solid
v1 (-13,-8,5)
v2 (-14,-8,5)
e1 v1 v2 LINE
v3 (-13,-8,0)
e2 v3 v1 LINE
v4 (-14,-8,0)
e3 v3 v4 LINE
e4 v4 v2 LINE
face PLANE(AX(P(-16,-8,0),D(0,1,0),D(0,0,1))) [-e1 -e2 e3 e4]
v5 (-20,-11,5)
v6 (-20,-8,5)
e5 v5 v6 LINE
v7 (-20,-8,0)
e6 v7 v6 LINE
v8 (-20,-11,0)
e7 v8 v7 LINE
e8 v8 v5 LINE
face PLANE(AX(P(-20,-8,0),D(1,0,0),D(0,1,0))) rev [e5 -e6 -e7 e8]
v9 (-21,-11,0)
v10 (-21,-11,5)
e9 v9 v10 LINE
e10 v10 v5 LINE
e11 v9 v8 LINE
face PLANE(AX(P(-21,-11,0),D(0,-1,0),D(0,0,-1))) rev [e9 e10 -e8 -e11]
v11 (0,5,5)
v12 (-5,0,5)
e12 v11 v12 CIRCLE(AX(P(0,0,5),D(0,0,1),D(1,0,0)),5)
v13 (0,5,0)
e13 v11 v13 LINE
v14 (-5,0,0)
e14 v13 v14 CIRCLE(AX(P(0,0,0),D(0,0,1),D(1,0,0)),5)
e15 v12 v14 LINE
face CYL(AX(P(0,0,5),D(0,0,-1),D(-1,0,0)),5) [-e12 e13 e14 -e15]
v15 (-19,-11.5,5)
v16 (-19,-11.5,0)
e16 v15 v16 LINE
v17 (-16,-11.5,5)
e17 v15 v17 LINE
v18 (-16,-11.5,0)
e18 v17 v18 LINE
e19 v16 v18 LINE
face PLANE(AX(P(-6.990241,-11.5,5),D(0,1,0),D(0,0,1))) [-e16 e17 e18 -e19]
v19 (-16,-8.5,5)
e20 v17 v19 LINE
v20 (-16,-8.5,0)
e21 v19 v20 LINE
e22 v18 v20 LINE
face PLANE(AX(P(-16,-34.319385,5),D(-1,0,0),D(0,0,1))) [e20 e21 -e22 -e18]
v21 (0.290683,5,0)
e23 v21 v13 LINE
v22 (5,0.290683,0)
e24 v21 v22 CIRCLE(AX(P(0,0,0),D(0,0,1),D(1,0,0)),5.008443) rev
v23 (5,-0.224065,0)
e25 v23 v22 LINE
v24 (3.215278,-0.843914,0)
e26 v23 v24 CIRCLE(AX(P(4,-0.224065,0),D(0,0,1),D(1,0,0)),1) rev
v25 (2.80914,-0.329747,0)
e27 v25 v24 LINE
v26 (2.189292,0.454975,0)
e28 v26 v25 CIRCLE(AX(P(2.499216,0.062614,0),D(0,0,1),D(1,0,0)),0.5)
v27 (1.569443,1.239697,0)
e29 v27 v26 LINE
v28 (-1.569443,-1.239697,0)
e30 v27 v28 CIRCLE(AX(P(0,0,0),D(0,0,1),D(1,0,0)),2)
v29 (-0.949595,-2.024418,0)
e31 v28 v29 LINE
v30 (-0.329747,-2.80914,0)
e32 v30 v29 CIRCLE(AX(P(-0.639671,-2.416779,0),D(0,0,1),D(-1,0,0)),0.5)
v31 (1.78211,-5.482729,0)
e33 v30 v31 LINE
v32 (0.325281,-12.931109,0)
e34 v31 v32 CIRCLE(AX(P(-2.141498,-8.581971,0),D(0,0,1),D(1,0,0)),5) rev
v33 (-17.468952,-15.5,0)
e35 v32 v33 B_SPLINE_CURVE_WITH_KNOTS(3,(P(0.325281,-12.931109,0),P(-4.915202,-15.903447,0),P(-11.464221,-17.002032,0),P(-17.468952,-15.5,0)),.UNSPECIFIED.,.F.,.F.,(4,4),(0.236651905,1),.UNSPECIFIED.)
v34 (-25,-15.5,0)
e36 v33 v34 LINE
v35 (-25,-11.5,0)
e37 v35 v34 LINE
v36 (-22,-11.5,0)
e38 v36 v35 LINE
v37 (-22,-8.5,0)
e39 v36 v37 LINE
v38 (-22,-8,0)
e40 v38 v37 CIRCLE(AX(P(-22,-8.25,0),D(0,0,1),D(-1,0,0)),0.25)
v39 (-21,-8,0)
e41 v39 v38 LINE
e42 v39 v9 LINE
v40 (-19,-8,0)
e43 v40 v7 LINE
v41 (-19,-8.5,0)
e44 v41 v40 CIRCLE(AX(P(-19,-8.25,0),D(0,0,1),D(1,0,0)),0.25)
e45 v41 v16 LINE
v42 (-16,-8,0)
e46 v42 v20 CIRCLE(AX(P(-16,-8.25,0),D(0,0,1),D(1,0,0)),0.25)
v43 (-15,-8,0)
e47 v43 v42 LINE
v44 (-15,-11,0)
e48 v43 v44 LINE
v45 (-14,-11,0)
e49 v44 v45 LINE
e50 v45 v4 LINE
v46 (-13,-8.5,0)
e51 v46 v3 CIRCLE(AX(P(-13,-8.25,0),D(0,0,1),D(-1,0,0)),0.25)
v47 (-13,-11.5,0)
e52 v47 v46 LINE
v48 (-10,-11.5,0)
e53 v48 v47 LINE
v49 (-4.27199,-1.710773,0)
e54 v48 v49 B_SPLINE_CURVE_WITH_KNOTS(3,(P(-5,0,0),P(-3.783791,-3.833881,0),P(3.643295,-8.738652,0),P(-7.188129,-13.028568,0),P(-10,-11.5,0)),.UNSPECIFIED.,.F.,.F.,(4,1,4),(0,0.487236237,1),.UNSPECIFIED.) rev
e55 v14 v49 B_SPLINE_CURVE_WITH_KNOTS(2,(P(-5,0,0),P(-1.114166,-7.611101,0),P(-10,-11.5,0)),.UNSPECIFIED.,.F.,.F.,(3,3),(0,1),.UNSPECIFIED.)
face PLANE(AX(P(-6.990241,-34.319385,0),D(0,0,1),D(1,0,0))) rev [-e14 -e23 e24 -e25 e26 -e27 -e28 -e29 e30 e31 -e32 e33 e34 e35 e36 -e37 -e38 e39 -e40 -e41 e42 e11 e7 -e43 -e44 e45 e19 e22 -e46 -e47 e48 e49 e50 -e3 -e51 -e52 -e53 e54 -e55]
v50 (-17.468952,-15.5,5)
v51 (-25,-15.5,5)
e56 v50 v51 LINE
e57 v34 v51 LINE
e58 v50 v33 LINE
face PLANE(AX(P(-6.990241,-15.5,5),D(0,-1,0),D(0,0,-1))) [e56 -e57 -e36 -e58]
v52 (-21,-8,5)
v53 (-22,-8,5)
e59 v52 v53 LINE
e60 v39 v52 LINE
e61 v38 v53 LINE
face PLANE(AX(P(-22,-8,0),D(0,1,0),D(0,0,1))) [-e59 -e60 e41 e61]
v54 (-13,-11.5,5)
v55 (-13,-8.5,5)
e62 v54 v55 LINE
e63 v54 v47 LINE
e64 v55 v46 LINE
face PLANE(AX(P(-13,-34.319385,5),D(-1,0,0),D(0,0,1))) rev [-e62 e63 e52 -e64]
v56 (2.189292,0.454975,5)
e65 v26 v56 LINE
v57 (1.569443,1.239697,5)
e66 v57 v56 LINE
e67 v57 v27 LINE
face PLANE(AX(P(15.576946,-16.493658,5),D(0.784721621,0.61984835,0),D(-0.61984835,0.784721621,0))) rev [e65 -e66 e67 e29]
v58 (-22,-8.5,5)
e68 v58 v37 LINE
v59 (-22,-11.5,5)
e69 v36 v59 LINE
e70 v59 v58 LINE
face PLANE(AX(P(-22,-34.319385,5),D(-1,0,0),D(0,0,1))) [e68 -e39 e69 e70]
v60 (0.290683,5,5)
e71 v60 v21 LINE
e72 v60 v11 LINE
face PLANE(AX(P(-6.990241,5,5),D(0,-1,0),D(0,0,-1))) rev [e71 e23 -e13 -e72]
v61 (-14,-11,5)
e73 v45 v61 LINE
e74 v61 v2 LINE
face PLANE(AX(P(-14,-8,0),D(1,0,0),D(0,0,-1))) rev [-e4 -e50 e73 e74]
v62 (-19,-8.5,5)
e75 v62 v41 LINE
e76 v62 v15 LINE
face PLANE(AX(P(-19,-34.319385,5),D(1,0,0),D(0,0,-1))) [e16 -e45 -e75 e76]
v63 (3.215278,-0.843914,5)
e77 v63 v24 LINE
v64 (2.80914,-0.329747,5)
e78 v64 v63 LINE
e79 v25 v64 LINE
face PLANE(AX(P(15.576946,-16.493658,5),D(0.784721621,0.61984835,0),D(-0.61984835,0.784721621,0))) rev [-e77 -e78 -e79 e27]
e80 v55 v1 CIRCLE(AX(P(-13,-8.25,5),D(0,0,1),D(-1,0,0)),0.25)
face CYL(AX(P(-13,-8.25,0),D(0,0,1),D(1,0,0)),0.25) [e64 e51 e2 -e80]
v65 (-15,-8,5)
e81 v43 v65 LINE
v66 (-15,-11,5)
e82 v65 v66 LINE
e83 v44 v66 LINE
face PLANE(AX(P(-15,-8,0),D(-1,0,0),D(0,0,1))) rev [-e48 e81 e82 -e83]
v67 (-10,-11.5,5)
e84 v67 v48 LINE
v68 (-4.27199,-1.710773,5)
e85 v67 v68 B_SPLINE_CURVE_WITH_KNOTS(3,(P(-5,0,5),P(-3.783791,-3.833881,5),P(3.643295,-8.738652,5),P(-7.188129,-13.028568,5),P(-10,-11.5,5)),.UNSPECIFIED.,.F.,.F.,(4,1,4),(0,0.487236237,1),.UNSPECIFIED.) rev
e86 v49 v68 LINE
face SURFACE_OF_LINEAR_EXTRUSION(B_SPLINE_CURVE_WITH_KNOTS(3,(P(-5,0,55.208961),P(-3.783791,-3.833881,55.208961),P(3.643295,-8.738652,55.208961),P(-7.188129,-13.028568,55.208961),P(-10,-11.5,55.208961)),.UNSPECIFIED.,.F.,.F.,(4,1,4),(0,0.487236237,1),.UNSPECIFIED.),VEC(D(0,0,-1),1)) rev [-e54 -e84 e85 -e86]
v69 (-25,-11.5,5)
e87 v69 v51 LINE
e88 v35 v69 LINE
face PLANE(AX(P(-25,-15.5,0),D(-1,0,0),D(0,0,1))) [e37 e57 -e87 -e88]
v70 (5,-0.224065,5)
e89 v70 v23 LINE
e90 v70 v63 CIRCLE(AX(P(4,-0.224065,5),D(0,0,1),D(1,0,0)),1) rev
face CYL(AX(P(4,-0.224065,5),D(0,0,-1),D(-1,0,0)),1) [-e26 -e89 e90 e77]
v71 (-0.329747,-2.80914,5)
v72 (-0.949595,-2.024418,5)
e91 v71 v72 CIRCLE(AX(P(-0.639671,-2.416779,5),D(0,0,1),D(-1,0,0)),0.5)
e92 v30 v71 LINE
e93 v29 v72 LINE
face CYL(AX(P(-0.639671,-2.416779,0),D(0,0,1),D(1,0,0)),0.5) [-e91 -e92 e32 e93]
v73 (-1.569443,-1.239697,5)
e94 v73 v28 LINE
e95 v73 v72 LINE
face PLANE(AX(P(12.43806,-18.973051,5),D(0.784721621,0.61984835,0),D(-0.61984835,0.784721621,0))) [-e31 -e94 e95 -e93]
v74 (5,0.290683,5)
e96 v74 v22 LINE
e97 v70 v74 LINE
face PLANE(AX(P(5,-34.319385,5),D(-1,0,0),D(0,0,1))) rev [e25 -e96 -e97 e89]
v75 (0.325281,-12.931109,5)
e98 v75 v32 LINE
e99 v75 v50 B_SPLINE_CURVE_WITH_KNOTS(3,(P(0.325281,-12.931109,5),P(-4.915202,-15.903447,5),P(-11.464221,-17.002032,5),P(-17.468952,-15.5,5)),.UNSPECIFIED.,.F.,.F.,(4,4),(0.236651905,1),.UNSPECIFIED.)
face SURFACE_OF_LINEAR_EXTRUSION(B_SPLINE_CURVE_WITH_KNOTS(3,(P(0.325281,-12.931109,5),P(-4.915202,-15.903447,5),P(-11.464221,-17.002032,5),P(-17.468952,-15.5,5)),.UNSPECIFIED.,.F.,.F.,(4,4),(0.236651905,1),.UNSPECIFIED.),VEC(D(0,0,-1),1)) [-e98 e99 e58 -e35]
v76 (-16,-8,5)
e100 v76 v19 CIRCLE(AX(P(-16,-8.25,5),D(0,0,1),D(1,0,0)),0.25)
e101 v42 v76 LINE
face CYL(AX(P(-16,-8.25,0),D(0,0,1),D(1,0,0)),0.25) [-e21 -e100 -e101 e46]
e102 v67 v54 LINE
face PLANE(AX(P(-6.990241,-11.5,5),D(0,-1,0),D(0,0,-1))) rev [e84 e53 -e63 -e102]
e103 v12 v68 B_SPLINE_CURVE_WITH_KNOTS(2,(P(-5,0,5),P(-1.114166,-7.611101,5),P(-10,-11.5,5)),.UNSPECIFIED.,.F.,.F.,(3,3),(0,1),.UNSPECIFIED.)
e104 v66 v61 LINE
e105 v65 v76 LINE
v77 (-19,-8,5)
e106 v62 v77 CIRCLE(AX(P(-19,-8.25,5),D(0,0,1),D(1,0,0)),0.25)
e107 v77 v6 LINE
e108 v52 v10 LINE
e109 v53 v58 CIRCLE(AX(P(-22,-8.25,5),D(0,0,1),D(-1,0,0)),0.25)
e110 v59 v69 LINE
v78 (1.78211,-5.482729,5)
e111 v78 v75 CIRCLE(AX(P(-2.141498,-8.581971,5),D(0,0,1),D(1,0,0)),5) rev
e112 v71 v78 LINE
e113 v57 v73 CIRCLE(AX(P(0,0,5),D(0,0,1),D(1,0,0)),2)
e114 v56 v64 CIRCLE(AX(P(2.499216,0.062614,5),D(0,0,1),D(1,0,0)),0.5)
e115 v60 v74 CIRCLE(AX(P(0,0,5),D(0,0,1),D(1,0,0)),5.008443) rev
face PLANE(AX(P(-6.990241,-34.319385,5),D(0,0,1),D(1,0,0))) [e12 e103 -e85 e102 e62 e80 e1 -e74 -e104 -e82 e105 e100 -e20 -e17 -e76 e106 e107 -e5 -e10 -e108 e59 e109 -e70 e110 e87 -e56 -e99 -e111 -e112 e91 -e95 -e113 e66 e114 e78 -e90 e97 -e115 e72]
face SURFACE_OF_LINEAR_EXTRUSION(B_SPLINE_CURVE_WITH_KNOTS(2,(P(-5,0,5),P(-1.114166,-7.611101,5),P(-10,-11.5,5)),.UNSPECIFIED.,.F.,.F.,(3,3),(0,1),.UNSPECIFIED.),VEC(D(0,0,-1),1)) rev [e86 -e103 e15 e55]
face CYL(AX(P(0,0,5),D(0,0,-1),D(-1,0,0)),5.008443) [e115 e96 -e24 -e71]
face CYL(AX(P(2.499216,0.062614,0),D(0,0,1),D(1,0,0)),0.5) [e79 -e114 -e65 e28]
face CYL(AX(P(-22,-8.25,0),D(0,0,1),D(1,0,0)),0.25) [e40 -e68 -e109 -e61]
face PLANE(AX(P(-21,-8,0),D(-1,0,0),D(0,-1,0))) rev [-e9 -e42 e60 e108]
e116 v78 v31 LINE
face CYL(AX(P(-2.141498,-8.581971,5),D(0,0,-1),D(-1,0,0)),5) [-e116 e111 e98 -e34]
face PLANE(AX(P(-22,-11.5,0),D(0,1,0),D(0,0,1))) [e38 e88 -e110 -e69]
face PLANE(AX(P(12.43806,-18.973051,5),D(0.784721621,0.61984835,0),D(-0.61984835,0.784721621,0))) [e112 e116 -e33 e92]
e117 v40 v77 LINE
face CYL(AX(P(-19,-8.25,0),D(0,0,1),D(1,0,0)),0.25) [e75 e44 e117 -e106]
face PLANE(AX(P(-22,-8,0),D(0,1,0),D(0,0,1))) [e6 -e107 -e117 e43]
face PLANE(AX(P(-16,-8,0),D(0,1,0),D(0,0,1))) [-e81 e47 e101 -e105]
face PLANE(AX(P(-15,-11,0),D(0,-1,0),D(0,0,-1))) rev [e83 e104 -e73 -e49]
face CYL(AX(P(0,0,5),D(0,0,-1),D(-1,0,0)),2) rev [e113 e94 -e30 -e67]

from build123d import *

# Parameters (mm, degrees)
BOSS_EXTRUDE1_DEPTH = 5
BOSS_EXTRUDE2_DEPTH = 5
CUT_EXTRUDE3_START  = -5
CUT_EXTRUDE3_DEPTH  = 5
SKETCH4_W           = 3
SKETCH4_H           = 4
BOSS_EXTRUDE3_DEPTH = 5
SKETCH5_W           = 1
SKETCH5_H           = 3
CUT_EXTRUDE4_DEPTH  = 5


# Read off the part's stored shape, not the designer's step: Cut-Extrude3
with BuildPart() as part:
    # Sketch1 → Boss-Extrude1 (new body)
    with BuildSketch(Plane.XY):
        with BuildLine():
            add(Edge.make_bspline(
                [(-5, 0), (-1.114165851, -7.611100797), (-10, -11.5)],
                knots=[0, 0, 0, 1, 1, 1], degree=2))
            Line((-10, -11.5), (-13, -11.5))
            Line((-13, -11.5), (-13, -8.5))
            Line((-13, -8.5), (-16, -8.5))
            Line((-16, -8.5), (-16, -11.5))
            Line((-16, -11.5), (-19, -11.5))
            Line((-19, -11.5), (-19, -8.5))
            Line((-19, -8.5), (-22, -8.5))
            Line((-22, -8.5), (-22, -15.5))
            Line((-22, -15.5), (-17.468951593, -15.5))
            add(Edge.make_bspline(
                [(-17.468951593, -15.5), (-11.464221473, -17.002032437), (-4.91520191, -15.903447496), (0.325280881, -12.931109156)],
                knots=[0.25236579, 0.25236579, 0.25236579, 0.25236579, 1.015713885, 1.015713885, 1.015713885, 1.015713885], degree=3))
            ThreePointArc((0.325280881, -12.931109156), (2.765522994, -9.541735665), (1.782110459, -5.482729135))
            Line((1.782110459, -5.482729135), (-1.569443242, -1.2396967))
            ThreePointArc((-1.569443242, -1.2396967), (-1.2396967, 1.569443242), (1.569443242, 1.2396967))
            Line((1.569443242, 1.2396967), (3.215278379, -0.843913615))
            ThreePointArc((3.215278379, -0.843913615), (4.328084119, -1.168713777), (5, -0.224065265))
            Line((5, -0.224065265), (5, 0.290683459))
            ThreePointArc((5, 0.290683459), (3.541503697, 3.541503697), (0.290683459, 5))
            Line((0.290683459, 5), (0, 5))
            ThreePointArc((0, 5), (-3.535533906, 3.535533906), (-5, 0))
        make_face()
    extrude(amount=BOSS_EXTRUDE1_DEPTH)

    # Sketch2 → Boss-Extrude2 (add)
    with BuildSketch(Plane.XY.offset(5)):
        with BuildLine():
            Line((2.189291593, 0.454975079), (2.809139943, -0.329746542))
            ThreePointArc((2.809139943, -0.329746542), (2.106854957, -0.247309907), (2.189291593, 0.454975079))
        make_face()
        with BuildLine():
            Line((-0.329746542, -2.809139943), (-0.949594892, -2.024418322))
            ThreePointArc((-0.949594892, -2.024418322), (-0.247309907, -2.106854957), (-0.329746542, -2.809139943))
        make_face()
    extrude(amount=-BOSS_EXTRUDE2_DEPTH)

    # Cut-Extrude3 outline → Cut-Extrude3 (cut)
    with BuildSketch(Plane.XY.offset(5).offset(CUT_EXTRUDE3_START)):
        with BuildLine():
            add(Edge.make_bspline(
                [(-4.271989908, -1.710772943), (-2.750457375, -4.583809325), (2.811238363, -9.068198313), (-7.188128971, -13.02856833), (-10, -11.5)],
                knots=[0.076818774, 0.076818774, 0.076818774, 0.076818774, 0.487236237, 1, 1, 1, 1], degree=3))
            add(Edge.make_bspline(
                [(-4.271989908, -1.710772943), (-2.141880314, -8.060881638), (-10, -11.5)],
                knots=[0.115657624, 0.115657624, 0.115657624, 1, 1, 1], degree=2))
        make_face()
    extrude(amount=CUT_EXTRUDE3_DEPTH, mode=Mode.SUBTRACT)

    # Sketch4 → Boss-Extrude3 (add)
    with BuildSketch(Plane.XY.offset(5)):
        with Locations((-23.5, -13.5)):
            Rectangle(SKETCH4_W, SKETCH4_H)
        with BuildLine():
            Line((-22, -8.5), (-19, -8.5))
            ThreePointArc((-19, -8.5), (-18.75, -8.25), (-19, -8))
            Line((-19, -8), (-22, -8))
            ThreePointArc((-22, -8), (-22.25, -8.25), (-22, -8.5))
        make_face()
        with BuildLine():
            Line((-16, -8.5), (-13, -8.5))
            ThreePointArc((-13, -8.5), (-12.75, -8.25), (-13, -8))
            Line((-13, -8), (-16, -8))
            ThreePointArc((-16, -8), (-16.25, -8.25), (-16, -8.5))
        make_face()
    extrude(amount=-BOSS_EXTRUDE3_DEPTH)

    # Sketch5 → Cut-Extrude4 (cut)
    with BuildSketch(Plane.XY.offset(5)):
        with Locations((-20.5, -9.5)):
            Rectangle(SKETCH5_W, SKETCH5_H)
        with Locations((-14.5, -9.5)):
            Rectangle(SKETCH5_W, SKETCH5_H)
    extrude(amount=-CUT_EXTRUDE4_DEPTH, mode=Mode.SUBTRACT)


solid = part.part
